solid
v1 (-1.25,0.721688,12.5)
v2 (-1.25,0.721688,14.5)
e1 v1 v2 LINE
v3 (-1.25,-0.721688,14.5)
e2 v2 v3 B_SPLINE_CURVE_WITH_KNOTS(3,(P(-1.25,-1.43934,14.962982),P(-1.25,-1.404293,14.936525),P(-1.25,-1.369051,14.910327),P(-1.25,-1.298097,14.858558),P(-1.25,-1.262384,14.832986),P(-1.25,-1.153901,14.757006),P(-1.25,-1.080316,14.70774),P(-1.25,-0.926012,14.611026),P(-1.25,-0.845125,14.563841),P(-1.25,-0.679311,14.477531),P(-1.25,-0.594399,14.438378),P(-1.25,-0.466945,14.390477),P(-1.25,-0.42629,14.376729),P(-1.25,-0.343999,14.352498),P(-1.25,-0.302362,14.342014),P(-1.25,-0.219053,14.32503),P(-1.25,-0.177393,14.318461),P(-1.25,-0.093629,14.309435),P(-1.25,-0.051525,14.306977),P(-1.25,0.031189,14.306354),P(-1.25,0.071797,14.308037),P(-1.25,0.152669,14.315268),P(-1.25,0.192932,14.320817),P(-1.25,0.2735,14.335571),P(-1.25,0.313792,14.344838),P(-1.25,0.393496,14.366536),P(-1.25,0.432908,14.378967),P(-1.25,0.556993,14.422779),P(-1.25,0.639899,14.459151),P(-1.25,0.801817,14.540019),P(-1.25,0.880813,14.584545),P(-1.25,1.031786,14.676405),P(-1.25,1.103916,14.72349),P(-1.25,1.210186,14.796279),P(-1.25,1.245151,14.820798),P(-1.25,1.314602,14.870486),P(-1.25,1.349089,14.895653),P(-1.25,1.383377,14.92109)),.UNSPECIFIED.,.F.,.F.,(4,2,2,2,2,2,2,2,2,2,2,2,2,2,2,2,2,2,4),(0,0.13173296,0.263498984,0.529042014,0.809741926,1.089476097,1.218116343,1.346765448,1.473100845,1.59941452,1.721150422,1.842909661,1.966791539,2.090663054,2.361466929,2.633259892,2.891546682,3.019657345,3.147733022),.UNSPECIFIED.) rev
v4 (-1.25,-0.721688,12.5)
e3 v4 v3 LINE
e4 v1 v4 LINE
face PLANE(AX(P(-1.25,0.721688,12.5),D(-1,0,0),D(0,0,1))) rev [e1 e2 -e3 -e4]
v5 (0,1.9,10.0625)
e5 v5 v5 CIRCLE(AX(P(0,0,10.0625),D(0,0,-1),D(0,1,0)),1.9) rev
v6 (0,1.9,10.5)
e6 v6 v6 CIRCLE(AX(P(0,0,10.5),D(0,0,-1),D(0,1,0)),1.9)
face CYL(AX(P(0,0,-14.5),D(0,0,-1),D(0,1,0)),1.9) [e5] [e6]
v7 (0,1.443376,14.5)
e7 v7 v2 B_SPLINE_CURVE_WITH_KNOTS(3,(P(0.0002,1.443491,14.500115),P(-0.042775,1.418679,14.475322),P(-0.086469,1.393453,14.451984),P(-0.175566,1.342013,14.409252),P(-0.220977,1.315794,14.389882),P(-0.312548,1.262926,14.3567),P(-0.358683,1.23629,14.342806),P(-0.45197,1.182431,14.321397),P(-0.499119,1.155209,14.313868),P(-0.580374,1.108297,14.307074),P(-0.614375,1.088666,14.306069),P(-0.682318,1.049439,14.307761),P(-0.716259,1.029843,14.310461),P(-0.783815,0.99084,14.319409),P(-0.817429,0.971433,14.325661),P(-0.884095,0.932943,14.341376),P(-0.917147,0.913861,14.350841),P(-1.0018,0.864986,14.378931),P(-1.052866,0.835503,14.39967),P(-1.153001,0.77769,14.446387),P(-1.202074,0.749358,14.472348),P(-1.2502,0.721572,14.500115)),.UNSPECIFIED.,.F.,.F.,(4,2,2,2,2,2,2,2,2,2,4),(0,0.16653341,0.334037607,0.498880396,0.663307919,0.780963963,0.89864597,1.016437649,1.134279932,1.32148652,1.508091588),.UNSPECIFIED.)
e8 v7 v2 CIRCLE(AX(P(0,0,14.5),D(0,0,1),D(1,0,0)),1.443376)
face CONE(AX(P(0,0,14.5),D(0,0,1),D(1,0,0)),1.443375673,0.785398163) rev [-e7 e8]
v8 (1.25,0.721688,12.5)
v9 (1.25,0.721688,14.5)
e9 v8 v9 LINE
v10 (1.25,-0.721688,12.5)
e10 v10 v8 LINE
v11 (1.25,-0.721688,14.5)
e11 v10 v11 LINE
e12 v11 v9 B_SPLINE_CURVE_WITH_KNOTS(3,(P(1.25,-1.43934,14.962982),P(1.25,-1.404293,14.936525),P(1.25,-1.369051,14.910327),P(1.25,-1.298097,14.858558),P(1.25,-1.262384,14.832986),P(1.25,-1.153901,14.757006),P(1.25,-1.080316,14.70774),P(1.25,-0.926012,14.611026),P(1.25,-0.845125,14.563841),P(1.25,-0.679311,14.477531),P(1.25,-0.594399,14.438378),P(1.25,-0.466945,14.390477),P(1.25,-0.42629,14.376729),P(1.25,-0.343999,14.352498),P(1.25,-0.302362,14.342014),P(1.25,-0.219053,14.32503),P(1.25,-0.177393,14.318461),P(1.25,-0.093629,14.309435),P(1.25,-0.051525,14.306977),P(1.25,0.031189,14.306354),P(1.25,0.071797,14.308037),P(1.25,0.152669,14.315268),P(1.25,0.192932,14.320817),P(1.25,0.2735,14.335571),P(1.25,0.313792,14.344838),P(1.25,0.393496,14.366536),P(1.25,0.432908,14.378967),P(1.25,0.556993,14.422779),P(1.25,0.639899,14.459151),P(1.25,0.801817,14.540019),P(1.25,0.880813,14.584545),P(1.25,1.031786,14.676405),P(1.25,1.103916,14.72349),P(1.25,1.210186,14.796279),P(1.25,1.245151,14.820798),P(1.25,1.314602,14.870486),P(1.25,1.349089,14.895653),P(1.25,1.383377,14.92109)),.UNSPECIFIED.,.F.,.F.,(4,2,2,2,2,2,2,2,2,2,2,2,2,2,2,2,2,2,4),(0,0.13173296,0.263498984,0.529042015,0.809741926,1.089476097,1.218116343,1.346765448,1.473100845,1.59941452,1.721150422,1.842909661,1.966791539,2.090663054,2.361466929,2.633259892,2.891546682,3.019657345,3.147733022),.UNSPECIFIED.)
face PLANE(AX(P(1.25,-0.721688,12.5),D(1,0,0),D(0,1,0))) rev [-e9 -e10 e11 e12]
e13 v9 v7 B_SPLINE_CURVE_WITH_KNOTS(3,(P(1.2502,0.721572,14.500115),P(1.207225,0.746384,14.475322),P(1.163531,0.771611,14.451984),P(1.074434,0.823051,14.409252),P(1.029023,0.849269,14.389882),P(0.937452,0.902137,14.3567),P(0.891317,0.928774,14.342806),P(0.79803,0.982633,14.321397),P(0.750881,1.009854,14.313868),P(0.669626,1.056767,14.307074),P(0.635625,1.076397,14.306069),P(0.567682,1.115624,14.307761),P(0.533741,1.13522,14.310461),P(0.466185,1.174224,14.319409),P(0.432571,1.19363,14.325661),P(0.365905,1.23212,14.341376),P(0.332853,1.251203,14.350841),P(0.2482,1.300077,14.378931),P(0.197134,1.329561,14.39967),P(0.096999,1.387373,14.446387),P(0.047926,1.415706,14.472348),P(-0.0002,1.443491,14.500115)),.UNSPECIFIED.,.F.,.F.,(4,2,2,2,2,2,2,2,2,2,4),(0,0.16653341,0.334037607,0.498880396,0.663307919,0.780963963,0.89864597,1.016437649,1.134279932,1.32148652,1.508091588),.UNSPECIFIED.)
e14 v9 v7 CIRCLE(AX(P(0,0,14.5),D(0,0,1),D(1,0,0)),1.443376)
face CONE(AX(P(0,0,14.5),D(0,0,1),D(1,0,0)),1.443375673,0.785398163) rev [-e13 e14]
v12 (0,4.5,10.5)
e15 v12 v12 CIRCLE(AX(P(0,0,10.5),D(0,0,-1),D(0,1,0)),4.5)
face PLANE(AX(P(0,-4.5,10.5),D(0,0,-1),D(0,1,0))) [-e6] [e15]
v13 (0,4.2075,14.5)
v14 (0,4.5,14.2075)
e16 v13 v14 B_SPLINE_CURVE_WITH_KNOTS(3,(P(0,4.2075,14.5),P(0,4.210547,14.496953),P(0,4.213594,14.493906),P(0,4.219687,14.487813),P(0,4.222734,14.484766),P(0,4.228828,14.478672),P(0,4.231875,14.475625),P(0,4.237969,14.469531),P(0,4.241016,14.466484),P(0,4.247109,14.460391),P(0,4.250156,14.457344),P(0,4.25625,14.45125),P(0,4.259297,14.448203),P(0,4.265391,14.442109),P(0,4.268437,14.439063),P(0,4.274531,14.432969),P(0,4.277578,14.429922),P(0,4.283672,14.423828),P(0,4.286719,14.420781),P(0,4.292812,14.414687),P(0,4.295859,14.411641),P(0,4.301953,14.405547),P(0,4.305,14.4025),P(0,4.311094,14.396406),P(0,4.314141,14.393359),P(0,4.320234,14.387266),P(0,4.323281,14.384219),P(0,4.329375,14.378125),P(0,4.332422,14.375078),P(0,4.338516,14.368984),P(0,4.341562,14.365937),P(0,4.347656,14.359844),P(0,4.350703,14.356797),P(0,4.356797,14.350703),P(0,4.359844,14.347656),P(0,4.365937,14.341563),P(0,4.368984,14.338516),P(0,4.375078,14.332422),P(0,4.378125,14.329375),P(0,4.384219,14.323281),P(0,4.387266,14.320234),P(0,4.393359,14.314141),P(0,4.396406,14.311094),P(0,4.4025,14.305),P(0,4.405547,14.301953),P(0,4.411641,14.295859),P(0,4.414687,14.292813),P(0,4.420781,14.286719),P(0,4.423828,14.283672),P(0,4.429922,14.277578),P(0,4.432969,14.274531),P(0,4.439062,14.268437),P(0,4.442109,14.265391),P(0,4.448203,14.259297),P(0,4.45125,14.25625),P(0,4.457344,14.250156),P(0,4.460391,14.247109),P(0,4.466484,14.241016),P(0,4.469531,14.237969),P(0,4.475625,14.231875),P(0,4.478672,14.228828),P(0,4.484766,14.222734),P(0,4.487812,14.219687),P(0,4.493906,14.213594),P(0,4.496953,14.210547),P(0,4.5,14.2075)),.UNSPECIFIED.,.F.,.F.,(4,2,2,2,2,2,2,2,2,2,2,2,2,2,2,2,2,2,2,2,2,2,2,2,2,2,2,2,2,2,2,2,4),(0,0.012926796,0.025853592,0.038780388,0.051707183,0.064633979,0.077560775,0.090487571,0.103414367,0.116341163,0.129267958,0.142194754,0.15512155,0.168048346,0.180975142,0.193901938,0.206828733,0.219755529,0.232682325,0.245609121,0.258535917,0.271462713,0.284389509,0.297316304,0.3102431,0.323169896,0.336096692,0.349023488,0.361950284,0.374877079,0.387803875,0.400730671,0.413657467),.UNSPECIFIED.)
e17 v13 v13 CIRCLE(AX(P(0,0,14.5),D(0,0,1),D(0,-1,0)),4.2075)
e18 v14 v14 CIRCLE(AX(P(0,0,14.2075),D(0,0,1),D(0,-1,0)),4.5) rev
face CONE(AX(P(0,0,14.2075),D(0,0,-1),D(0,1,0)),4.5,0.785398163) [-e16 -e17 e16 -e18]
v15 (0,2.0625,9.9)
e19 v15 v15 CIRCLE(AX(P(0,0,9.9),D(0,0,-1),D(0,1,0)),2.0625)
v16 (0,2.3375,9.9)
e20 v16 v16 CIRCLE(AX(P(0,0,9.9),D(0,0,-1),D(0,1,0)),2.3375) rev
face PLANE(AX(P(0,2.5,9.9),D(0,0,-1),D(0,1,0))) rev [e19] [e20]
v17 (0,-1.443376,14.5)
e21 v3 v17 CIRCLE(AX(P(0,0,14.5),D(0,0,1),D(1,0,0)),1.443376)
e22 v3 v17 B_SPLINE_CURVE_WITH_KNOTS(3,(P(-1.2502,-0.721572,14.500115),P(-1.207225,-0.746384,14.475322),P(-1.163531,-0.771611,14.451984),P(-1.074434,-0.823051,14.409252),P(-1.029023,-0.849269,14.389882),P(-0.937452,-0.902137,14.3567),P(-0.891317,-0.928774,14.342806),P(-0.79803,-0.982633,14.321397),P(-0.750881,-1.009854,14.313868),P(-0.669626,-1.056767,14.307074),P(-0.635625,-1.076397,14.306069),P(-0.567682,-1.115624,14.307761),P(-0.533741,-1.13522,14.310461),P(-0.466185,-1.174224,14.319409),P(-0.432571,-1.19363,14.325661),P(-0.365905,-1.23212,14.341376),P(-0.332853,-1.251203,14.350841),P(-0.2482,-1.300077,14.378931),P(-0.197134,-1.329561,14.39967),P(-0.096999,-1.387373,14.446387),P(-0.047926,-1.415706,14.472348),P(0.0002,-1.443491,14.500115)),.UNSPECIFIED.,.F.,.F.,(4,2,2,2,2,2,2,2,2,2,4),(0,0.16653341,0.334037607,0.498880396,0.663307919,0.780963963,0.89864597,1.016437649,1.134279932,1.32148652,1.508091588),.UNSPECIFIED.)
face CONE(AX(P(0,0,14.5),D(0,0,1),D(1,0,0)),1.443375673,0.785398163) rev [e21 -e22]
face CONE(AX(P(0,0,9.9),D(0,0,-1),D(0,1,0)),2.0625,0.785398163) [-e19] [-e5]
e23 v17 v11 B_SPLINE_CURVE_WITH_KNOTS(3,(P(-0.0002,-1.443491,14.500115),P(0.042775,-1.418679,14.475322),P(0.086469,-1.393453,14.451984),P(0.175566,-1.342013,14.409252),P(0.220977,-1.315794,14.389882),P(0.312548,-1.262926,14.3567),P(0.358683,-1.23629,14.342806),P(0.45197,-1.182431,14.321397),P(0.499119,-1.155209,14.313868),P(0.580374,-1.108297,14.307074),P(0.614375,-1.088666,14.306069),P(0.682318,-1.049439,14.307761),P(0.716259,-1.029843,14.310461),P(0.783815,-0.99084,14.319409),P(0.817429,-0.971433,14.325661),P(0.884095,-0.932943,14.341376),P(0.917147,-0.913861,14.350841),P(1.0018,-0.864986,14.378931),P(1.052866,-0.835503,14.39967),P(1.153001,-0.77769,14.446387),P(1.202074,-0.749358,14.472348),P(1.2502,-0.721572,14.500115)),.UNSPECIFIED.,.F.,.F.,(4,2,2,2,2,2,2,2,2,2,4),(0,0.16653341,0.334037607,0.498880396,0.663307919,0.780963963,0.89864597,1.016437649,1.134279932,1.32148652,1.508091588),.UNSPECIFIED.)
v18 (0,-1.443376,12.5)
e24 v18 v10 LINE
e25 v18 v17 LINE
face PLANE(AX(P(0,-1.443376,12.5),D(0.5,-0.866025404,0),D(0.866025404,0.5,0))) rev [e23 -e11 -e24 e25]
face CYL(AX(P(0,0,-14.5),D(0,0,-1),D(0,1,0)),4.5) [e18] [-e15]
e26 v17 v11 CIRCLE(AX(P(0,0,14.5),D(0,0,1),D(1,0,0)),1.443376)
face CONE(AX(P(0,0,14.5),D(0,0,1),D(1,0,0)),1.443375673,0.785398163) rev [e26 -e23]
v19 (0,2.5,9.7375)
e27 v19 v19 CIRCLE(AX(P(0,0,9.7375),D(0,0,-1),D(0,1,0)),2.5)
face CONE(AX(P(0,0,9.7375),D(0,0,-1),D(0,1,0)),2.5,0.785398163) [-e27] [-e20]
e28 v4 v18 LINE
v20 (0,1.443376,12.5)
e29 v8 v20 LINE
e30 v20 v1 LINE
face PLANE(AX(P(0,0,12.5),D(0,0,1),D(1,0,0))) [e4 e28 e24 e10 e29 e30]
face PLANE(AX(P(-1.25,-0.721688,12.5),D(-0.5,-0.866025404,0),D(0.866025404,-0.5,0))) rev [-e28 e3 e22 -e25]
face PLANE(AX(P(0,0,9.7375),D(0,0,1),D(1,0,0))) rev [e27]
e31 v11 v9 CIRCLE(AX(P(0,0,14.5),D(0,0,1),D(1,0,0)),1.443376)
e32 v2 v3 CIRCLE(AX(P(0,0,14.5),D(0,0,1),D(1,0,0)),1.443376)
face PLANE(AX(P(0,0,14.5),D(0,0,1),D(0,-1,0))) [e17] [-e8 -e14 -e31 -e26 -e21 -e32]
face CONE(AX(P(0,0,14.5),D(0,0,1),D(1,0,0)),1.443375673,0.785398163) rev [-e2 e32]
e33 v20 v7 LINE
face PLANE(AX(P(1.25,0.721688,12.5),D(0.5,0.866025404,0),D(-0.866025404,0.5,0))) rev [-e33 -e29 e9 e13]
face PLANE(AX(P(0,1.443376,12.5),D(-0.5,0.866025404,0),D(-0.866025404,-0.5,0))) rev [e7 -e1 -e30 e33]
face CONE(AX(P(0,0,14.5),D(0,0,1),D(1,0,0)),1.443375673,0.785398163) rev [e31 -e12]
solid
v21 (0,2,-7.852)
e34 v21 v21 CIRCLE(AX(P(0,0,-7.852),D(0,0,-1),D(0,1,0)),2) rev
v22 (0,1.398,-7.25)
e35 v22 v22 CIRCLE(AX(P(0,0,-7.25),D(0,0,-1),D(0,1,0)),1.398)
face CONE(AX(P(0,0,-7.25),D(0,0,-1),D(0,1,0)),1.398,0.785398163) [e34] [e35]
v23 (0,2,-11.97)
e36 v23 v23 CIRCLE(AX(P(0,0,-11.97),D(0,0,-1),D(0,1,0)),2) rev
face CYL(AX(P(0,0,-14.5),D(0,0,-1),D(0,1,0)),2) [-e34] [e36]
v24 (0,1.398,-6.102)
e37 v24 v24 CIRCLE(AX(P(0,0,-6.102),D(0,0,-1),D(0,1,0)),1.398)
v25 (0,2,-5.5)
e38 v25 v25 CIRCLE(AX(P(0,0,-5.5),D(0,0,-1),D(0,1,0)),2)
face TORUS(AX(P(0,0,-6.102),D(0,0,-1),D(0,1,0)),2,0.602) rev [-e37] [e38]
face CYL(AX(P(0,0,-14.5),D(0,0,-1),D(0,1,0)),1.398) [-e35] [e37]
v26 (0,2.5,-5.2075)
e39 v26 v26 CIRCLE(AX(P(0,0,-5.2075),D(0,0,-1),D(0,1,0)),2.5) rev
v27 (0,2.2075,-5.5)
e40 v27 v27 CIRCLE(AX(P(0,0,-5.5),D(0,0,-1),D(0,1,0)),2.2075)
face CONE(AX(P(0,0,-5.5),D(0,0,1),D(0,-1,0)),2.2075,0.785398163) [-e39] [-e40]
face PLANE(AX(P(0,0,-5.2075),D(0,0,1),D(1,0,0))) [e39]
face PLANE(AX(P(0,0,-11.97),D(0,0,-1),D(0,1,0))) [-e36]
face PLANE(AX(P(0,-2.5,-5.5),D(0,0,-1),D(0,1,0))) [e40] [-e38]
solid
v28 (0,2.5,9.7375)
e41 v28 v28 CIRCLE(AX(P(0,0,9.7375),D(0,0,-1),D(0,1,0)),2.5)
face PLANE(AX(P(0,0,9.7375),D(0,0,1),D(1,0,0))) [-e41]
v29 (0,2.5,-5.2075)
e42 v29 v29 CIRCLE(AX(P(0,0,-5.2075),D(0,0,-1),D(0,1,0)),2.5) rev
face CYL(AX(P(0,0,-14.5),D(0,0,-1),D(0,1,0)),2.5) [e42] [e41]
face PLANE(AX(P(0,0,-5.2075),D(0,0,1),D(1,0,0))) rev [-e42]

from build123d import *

# Parameters (mm, degrees)
SKETCH4_W           = 0.6
SKETCH4_H           = 0.6
CHAMFER1_SIZE       = 0.1625
CHAMFER2_SIZE       = 0.5
CHAMFER3_SIZE       = 0.2925
CUT_EXTRUDE1_DEPTH  = 2
SPLIT2_START        = -5.2075
SPLIT2_OUTLINE_R    = 4.5
SPLIT2_DEPTH        = 19.7075
SPLIT2_START_2      = 12.5
SPLIT2_3_DEPTH      = 2
SPLIT2_10_OUTLINE_R = 2.5
SPLIT2_10_DEPTH     = 14.945
SKETCH15_R          = 2.571420452
CUT_EXTRUDE4_DEPTH  = 2.53


with BuildPart() as part:
    # Sketch3 → Revolve1 (revolve)
    with BuildSketch(Plane(origin=(0, 0, 0), x_dir=(0, 0, -1), z_dir=(1, 0, 0))):
        Polygon((-14.5, 4.5), (-10.5, 4.5), (-10.5, 2.5), (5.5, 2.5), (5.5, 2), (14.5, 2), (14.5, 0), (-14.5, 0), align=None)
    revolve(axis=Axis((0, 0, -14.5), (0, 0, 1)))

    # Sketch4 → Cut-Revolve1 (revolve, cut)
    with BuildSketch(Plane(origin=(0, 0, 0), x_dir=(0, 0, -1), z_dir=(1, 0, 0))):
        with Locations((-10.2, 2.2)):
            Rectangle(SKETCH4_W, SKETCH4_H)
    revolve(axis=Axis((0, 0, -14.5), (0, 0, 1)), mode=Mode.SUBTRACT)

    # Chamfer1
    chamfer1_edges = [part.edges().sort_by_distance(p)[0] for p in [
        (0, -1.9, 9.9),
        (0, -2.5, 9.9),
    ]]
    chamfer(chamfer1_edges, length=CHAMFER1_SIZE)

    # Sketch6 → Cut-Revolve2 (revolve, cut)
    with BuildSketch(Plane(origin=(0, 0, 0), x_dir=(0, 0, -1), z_dir=(1, 0, 0))):
        with BuildLine():
            Line((5.5, 2.5), (8.352, 2.5))
            Line((8.352, 2.5), (7.25, 1.398))
            Line((7.25, 1.398), (6.102, 1.398))
            ThreePointArc((6.102, 1.398), (5.676321718, 1.574321718), (5.5, 2))
            Line((5.5, 2), (5.5, 2.5))
        make_face()
    revolve(axis=Axis((0, 0, -14.5), (0, 0, 1)), mode=Mode.SUBTRACT)

    # Chamfer2
    chamfer2_edges = [part.edges().sort_by_distance(p)[0] for p in [
        (0, -2, -14.5),
    ]]
    chamfer(chamfer2_edges, length=CHAMFER2_SIZE)

    # Chamfer3
    chamfer3_edges = [part.edges().sort_by_distance(p)[0] for p in [
        (0, -2.5, -5.5),
        (0, -4.5, 14.5),
    ]]
    chamfer(chamfer3_edges, length=CHAMFER3_SIZE)

    # Sketch8 → Cut-Extrude1 (cut)
    with BuildSketch(Plane.XY.offset(14.5)):
        Polygon((1.25, 0.721687836), (0, 1.443375673), (-1.25, 0.721687836), (-1.25, -0.721687836), (0, -1.443375673), (1.25, -0.721687836), align=None)
    extrude(amount=-CUT_EXTRUDE1_DEPTH, mode=Mode.SUBTRACT)

    # Cut-Extrude2 cone 1 section (through the dimple's axis) → Cut-Extrude2 (revolve, cut)
    with BuildSketch(Plane(origin=(0, 0, 14.5), x_dir=(0, -1, 0), z_dir=(1, 0, 0))):
        Polygon((0, 0), (1.443375673, 0), (0, 1.443375673), align=None)
    revolve(axis=Axis((0, 0, 14.5), (0, 0, -1)), mode=Mode.SUBTRACT)

    # Split2: read off the stored shape, not the designer's step
    # Split2 outline → Split2 (cut)
    with BuildSketch(Plane.XY.offset(SPLIT2_START)):
        Circle(SPLIT2_OUTLINE_R)
    extrude(amount=SPLIT2_DEPTH, mode=Mode.SUBTRACT)

    # Sketch15 → Cut-Extrude4 (cut)
    with BuildSketch(Plane(origin=(0, 0, -14.5), x_dir=(-1, 0, 0), z_dir=(0, 0, -1))):
        Circle(SKETCH15_R)
    extrude(amount=-CUT_EXTRUDE4_DEPTH, mode=Mode.SUBTRACT)


with BuildPart() as body_2:
    # Split2 2 outline → Split2 2 (revolve)
    with BuildSketch(Plane.XZ):
        Polygon((0, 14.500000022), (0, 9.7375), (2.5, 9.7375), (2.3375, 9.9), (2.0625, 9.9), (1.9, 10.0625), (1.9, 10.5), (4.5, 10.5), (4.5, 14.2075), (4.2075, 14.5), (1.443375689, 14.500000017), align=None)
    revolve(axis=Axis((0, 0, 0), (0, 0, 1)))

    # Split2 3 outline → Split2 3 (cut)
    with BuildSketch(Plane.XY.offset(SPLIT2_START_2)):
        Polygon((1.25, -0.721687836), (1.25, 0.721687836), (0, 1.443375673), (-1.25, 0.721687836), (-1.25, -0.721687836), (0, -1.443375673), align=None)
    extrude(amount=SPLIT2_3_DEPTH, mode=Mode.SUBTRACT)

    # Split2 4: loft between two sections, ruled curve by curve
    split2_4_from = [
        Edge.make_three_point_arc((1.08239615, 0.624921709, 14.306467745), (0.624921709, 1.08239615, 14.306467745), (0, 1.249843418, 14.306467745)),
        Edge.make_line((0, 1.249843418, 14.306467745), (1.08239615, 0.624921709, 14.306467745)),
    ]
    split2_4_to = [
        Edge.make_three_point_arc((1.250000029, 0.721687853, 14.500000033), (0.721687853, 1.250000029, 14.500000033), (0, 1.443375706, 14.500000033)),
        Edge.make_line((0, 1.443375706, 14.500000033), (1.250000029, 0.721687853, 14.500000033)),
    ]
    split2_4 = Solid(Shell([*[Face.make_surface_from_curves(split2_4_from[k], split2_4_to[k]) for k in range(2)], Face(Wire(split2_4_from)), Face(Wire(split2_4_to))]))
    add(split2_4, mode=Mode.SUBTRACT)

    # Split2 5: loft between two sections, ruled curve by curve
    split2_5_from = [
        Edge.make_three_point_arc((0, 1.249843418, 14.306467745), (-0.624921709, 1.08239615, 14.306467745), (-1.08239615, 0.624921709, 14.306467745)),
        Edge.make_line((-1.08239615, 0.624921709, 14.306467745), (0, 1.249843418, 14.306467745)),
    ]
    split2_5_to = [
        Edge.make_three_point_arc((0, 1.443375706, 14.500000033), (-0.721687853, 1.250000029, 14.500000033), (-1.250000029, 0.721687853, 14.500000033)),
        Edge.make_line((-1.250000029, 0.721687853, 14.500000033), (0, 1.443375706, 14.500000033)),
    ]
    split2_5 = Solid(Shell([*[Face.make_surface_from_curves(split2_5_from[k], split2_5_to[k]) for k in range(2)], Face(Wire(split2_5_from)), Face(Wire(split2_5_to))]))
    add(split2_5, mode=Mode.SUBTRACT)

    # Split2 6: loft between two sections, ruled curve by curve
    split2_6_from = [
        Edge.make_three_point_arc((-1.082395782, 0.624921515, 14.306467329), (-1.249843002, -4.66e-07, 14.306467329), (-1.082395316, -0.624922322, 14.306467329)),
        Edge.make_line((-1.082395316, -0.624922322, 14.306467329), (-1.082395782, 0.624921515, 14.306467329)),
    ]
    split2_6_to = [
        Edge.make_three_point_arc((-1.249999991, 0.721687853, 14.5), (-1.443375673, -5.38e-07, 14.5), (-1.249999452, -0.721688785, 14.5)),
        Edge.make_line((-1.249999452, -0.721688785, 14.5), (-1.249999991, 0.721687853, 14.5)),
    ]
    split2_6 = Solid(Shell([*[Face.make_surface_from_curves(split2_6_from[k], split2_6_to[k]) for k in range(2)], Face(Wire(split2_6_from)), Face(Wire(split2_6_to))]))
    add(split2_6, mode=Mode.SUBTRACT)

    # Split2 7: loft between two sections, ruled curve by curve
    split2_7_from = [
        Edge.make_three_point_arc((-1.08239615, -0.624921709, 14.306467745), (-0.624921709, -1.08239615, 14.306467745), (0, -1.249843418, 14.306467745)),
        Edge.make_line((0, -1.249843418, 14.306467745), (-1.08239615, -0.624921709, 14.306467745)),
    ]
    split2_7_to = [
        Edge.make_three_point_arc((-1.250000029, -0.721687853, 14.500000033), (-0.721687853, -1.250000029, 14.500000033), (0, -1.443375706, 14.500000033)),
        Edge.make_line((0, -1.443375706, 14.500000033), (-1.250000029, -0.721687853, 14.500000033)),
    ]
    split2_7 = Solid(Shell([*[Face.make_surface_from_curves(split2_7_from[k], split2_7_to[k]) for k in range(2)], Face(Wire(split2_7_from)), Face(Wire(split2_7_to))]))
    add(split2_7, mode=Mode.SUBTRACT)

    # Split2 8: loft between two sections, ruled curve by curve
    split2_8_from = [
        Edge.make_three_point_arc((0, -1.249843418, 14.306467745), (0.624921709, -1.08239615, 14.306467745), (1.08239615, -0.624921709, 14.306467745)),
        Edge.make_line((1.08239615, -0.624921709, 14.306467745), (0, -1.249843418, 14.306467745)),
    ]
    split2_8_to = [
        Edge.make_three_point_arc((0, -1.443375706, 14.500000033), (0.721687853, -1.250000029, 14.500000033), (1.250000029, -0.721687853, 14.500000033)),
        Edge.make_line((1.250000029, -0.721687853, 14.500000033), (0, -1.443375706, 14.500000033)),
    ]
    split2_8 = Solid(Shell([*[Face.make_surface_from_curves(split2_8_from[k], split2_8_to[k]) for k in range(2)], Face(Wire(split2_8_from)), Face(Wire(split2_8_to))]))
    add(split2_8, mode=Mode.SUBTRACT)

    # Split2 9: loft between two sections, ruled curve by curve
    split2_9_from = [
        Edge.make_three_point_arc((1.082395316, -0.624922322, 14.306467329), (1.249843002, -4.66e-07, 14.306467329), (1.082395782, 0.624921515, 14.306467329)),
        Edge.make_line((1.082395782, 0.624921515, 14.306467329), (1.082395316, -0.624922322, 14.306467329)),
    ]
    split2_9_to = [
        Edge.make_three_point_arc((1.249999452, -0.721688785, 14.5), (1.443375673, -5.38e-07, 14.5), (1.249999991, 0.721687853, 14.5)),
        Edge.make_line((1.249999991, 0.721687853, 14.5), (1.249999452, -0.721688785, 14.5)),
    ]
    split2_9 = Solid(Shell([*[Face.make_surface_from_curves(split2_9_from[k], split2_9_to[k]) for k in range(2)], Face(Wire(split2_9_from)), Face(Wire(split2_9_to))]))
    add(split2_9, mode=Mode.SUBTRACT)


with BuildPart() as body_3:
    # Split2 10 outline → Split2 10 (new body)
    with BuildSketch(Plane.XY.offset(SPLIT2_START)):
        Circle(SPLIT2_10_OUTLINE_R)
    extrude(amount=SPLIT2_10_DEPTH)


solid = Compound([part.part, body_2.part, body_3.part])
